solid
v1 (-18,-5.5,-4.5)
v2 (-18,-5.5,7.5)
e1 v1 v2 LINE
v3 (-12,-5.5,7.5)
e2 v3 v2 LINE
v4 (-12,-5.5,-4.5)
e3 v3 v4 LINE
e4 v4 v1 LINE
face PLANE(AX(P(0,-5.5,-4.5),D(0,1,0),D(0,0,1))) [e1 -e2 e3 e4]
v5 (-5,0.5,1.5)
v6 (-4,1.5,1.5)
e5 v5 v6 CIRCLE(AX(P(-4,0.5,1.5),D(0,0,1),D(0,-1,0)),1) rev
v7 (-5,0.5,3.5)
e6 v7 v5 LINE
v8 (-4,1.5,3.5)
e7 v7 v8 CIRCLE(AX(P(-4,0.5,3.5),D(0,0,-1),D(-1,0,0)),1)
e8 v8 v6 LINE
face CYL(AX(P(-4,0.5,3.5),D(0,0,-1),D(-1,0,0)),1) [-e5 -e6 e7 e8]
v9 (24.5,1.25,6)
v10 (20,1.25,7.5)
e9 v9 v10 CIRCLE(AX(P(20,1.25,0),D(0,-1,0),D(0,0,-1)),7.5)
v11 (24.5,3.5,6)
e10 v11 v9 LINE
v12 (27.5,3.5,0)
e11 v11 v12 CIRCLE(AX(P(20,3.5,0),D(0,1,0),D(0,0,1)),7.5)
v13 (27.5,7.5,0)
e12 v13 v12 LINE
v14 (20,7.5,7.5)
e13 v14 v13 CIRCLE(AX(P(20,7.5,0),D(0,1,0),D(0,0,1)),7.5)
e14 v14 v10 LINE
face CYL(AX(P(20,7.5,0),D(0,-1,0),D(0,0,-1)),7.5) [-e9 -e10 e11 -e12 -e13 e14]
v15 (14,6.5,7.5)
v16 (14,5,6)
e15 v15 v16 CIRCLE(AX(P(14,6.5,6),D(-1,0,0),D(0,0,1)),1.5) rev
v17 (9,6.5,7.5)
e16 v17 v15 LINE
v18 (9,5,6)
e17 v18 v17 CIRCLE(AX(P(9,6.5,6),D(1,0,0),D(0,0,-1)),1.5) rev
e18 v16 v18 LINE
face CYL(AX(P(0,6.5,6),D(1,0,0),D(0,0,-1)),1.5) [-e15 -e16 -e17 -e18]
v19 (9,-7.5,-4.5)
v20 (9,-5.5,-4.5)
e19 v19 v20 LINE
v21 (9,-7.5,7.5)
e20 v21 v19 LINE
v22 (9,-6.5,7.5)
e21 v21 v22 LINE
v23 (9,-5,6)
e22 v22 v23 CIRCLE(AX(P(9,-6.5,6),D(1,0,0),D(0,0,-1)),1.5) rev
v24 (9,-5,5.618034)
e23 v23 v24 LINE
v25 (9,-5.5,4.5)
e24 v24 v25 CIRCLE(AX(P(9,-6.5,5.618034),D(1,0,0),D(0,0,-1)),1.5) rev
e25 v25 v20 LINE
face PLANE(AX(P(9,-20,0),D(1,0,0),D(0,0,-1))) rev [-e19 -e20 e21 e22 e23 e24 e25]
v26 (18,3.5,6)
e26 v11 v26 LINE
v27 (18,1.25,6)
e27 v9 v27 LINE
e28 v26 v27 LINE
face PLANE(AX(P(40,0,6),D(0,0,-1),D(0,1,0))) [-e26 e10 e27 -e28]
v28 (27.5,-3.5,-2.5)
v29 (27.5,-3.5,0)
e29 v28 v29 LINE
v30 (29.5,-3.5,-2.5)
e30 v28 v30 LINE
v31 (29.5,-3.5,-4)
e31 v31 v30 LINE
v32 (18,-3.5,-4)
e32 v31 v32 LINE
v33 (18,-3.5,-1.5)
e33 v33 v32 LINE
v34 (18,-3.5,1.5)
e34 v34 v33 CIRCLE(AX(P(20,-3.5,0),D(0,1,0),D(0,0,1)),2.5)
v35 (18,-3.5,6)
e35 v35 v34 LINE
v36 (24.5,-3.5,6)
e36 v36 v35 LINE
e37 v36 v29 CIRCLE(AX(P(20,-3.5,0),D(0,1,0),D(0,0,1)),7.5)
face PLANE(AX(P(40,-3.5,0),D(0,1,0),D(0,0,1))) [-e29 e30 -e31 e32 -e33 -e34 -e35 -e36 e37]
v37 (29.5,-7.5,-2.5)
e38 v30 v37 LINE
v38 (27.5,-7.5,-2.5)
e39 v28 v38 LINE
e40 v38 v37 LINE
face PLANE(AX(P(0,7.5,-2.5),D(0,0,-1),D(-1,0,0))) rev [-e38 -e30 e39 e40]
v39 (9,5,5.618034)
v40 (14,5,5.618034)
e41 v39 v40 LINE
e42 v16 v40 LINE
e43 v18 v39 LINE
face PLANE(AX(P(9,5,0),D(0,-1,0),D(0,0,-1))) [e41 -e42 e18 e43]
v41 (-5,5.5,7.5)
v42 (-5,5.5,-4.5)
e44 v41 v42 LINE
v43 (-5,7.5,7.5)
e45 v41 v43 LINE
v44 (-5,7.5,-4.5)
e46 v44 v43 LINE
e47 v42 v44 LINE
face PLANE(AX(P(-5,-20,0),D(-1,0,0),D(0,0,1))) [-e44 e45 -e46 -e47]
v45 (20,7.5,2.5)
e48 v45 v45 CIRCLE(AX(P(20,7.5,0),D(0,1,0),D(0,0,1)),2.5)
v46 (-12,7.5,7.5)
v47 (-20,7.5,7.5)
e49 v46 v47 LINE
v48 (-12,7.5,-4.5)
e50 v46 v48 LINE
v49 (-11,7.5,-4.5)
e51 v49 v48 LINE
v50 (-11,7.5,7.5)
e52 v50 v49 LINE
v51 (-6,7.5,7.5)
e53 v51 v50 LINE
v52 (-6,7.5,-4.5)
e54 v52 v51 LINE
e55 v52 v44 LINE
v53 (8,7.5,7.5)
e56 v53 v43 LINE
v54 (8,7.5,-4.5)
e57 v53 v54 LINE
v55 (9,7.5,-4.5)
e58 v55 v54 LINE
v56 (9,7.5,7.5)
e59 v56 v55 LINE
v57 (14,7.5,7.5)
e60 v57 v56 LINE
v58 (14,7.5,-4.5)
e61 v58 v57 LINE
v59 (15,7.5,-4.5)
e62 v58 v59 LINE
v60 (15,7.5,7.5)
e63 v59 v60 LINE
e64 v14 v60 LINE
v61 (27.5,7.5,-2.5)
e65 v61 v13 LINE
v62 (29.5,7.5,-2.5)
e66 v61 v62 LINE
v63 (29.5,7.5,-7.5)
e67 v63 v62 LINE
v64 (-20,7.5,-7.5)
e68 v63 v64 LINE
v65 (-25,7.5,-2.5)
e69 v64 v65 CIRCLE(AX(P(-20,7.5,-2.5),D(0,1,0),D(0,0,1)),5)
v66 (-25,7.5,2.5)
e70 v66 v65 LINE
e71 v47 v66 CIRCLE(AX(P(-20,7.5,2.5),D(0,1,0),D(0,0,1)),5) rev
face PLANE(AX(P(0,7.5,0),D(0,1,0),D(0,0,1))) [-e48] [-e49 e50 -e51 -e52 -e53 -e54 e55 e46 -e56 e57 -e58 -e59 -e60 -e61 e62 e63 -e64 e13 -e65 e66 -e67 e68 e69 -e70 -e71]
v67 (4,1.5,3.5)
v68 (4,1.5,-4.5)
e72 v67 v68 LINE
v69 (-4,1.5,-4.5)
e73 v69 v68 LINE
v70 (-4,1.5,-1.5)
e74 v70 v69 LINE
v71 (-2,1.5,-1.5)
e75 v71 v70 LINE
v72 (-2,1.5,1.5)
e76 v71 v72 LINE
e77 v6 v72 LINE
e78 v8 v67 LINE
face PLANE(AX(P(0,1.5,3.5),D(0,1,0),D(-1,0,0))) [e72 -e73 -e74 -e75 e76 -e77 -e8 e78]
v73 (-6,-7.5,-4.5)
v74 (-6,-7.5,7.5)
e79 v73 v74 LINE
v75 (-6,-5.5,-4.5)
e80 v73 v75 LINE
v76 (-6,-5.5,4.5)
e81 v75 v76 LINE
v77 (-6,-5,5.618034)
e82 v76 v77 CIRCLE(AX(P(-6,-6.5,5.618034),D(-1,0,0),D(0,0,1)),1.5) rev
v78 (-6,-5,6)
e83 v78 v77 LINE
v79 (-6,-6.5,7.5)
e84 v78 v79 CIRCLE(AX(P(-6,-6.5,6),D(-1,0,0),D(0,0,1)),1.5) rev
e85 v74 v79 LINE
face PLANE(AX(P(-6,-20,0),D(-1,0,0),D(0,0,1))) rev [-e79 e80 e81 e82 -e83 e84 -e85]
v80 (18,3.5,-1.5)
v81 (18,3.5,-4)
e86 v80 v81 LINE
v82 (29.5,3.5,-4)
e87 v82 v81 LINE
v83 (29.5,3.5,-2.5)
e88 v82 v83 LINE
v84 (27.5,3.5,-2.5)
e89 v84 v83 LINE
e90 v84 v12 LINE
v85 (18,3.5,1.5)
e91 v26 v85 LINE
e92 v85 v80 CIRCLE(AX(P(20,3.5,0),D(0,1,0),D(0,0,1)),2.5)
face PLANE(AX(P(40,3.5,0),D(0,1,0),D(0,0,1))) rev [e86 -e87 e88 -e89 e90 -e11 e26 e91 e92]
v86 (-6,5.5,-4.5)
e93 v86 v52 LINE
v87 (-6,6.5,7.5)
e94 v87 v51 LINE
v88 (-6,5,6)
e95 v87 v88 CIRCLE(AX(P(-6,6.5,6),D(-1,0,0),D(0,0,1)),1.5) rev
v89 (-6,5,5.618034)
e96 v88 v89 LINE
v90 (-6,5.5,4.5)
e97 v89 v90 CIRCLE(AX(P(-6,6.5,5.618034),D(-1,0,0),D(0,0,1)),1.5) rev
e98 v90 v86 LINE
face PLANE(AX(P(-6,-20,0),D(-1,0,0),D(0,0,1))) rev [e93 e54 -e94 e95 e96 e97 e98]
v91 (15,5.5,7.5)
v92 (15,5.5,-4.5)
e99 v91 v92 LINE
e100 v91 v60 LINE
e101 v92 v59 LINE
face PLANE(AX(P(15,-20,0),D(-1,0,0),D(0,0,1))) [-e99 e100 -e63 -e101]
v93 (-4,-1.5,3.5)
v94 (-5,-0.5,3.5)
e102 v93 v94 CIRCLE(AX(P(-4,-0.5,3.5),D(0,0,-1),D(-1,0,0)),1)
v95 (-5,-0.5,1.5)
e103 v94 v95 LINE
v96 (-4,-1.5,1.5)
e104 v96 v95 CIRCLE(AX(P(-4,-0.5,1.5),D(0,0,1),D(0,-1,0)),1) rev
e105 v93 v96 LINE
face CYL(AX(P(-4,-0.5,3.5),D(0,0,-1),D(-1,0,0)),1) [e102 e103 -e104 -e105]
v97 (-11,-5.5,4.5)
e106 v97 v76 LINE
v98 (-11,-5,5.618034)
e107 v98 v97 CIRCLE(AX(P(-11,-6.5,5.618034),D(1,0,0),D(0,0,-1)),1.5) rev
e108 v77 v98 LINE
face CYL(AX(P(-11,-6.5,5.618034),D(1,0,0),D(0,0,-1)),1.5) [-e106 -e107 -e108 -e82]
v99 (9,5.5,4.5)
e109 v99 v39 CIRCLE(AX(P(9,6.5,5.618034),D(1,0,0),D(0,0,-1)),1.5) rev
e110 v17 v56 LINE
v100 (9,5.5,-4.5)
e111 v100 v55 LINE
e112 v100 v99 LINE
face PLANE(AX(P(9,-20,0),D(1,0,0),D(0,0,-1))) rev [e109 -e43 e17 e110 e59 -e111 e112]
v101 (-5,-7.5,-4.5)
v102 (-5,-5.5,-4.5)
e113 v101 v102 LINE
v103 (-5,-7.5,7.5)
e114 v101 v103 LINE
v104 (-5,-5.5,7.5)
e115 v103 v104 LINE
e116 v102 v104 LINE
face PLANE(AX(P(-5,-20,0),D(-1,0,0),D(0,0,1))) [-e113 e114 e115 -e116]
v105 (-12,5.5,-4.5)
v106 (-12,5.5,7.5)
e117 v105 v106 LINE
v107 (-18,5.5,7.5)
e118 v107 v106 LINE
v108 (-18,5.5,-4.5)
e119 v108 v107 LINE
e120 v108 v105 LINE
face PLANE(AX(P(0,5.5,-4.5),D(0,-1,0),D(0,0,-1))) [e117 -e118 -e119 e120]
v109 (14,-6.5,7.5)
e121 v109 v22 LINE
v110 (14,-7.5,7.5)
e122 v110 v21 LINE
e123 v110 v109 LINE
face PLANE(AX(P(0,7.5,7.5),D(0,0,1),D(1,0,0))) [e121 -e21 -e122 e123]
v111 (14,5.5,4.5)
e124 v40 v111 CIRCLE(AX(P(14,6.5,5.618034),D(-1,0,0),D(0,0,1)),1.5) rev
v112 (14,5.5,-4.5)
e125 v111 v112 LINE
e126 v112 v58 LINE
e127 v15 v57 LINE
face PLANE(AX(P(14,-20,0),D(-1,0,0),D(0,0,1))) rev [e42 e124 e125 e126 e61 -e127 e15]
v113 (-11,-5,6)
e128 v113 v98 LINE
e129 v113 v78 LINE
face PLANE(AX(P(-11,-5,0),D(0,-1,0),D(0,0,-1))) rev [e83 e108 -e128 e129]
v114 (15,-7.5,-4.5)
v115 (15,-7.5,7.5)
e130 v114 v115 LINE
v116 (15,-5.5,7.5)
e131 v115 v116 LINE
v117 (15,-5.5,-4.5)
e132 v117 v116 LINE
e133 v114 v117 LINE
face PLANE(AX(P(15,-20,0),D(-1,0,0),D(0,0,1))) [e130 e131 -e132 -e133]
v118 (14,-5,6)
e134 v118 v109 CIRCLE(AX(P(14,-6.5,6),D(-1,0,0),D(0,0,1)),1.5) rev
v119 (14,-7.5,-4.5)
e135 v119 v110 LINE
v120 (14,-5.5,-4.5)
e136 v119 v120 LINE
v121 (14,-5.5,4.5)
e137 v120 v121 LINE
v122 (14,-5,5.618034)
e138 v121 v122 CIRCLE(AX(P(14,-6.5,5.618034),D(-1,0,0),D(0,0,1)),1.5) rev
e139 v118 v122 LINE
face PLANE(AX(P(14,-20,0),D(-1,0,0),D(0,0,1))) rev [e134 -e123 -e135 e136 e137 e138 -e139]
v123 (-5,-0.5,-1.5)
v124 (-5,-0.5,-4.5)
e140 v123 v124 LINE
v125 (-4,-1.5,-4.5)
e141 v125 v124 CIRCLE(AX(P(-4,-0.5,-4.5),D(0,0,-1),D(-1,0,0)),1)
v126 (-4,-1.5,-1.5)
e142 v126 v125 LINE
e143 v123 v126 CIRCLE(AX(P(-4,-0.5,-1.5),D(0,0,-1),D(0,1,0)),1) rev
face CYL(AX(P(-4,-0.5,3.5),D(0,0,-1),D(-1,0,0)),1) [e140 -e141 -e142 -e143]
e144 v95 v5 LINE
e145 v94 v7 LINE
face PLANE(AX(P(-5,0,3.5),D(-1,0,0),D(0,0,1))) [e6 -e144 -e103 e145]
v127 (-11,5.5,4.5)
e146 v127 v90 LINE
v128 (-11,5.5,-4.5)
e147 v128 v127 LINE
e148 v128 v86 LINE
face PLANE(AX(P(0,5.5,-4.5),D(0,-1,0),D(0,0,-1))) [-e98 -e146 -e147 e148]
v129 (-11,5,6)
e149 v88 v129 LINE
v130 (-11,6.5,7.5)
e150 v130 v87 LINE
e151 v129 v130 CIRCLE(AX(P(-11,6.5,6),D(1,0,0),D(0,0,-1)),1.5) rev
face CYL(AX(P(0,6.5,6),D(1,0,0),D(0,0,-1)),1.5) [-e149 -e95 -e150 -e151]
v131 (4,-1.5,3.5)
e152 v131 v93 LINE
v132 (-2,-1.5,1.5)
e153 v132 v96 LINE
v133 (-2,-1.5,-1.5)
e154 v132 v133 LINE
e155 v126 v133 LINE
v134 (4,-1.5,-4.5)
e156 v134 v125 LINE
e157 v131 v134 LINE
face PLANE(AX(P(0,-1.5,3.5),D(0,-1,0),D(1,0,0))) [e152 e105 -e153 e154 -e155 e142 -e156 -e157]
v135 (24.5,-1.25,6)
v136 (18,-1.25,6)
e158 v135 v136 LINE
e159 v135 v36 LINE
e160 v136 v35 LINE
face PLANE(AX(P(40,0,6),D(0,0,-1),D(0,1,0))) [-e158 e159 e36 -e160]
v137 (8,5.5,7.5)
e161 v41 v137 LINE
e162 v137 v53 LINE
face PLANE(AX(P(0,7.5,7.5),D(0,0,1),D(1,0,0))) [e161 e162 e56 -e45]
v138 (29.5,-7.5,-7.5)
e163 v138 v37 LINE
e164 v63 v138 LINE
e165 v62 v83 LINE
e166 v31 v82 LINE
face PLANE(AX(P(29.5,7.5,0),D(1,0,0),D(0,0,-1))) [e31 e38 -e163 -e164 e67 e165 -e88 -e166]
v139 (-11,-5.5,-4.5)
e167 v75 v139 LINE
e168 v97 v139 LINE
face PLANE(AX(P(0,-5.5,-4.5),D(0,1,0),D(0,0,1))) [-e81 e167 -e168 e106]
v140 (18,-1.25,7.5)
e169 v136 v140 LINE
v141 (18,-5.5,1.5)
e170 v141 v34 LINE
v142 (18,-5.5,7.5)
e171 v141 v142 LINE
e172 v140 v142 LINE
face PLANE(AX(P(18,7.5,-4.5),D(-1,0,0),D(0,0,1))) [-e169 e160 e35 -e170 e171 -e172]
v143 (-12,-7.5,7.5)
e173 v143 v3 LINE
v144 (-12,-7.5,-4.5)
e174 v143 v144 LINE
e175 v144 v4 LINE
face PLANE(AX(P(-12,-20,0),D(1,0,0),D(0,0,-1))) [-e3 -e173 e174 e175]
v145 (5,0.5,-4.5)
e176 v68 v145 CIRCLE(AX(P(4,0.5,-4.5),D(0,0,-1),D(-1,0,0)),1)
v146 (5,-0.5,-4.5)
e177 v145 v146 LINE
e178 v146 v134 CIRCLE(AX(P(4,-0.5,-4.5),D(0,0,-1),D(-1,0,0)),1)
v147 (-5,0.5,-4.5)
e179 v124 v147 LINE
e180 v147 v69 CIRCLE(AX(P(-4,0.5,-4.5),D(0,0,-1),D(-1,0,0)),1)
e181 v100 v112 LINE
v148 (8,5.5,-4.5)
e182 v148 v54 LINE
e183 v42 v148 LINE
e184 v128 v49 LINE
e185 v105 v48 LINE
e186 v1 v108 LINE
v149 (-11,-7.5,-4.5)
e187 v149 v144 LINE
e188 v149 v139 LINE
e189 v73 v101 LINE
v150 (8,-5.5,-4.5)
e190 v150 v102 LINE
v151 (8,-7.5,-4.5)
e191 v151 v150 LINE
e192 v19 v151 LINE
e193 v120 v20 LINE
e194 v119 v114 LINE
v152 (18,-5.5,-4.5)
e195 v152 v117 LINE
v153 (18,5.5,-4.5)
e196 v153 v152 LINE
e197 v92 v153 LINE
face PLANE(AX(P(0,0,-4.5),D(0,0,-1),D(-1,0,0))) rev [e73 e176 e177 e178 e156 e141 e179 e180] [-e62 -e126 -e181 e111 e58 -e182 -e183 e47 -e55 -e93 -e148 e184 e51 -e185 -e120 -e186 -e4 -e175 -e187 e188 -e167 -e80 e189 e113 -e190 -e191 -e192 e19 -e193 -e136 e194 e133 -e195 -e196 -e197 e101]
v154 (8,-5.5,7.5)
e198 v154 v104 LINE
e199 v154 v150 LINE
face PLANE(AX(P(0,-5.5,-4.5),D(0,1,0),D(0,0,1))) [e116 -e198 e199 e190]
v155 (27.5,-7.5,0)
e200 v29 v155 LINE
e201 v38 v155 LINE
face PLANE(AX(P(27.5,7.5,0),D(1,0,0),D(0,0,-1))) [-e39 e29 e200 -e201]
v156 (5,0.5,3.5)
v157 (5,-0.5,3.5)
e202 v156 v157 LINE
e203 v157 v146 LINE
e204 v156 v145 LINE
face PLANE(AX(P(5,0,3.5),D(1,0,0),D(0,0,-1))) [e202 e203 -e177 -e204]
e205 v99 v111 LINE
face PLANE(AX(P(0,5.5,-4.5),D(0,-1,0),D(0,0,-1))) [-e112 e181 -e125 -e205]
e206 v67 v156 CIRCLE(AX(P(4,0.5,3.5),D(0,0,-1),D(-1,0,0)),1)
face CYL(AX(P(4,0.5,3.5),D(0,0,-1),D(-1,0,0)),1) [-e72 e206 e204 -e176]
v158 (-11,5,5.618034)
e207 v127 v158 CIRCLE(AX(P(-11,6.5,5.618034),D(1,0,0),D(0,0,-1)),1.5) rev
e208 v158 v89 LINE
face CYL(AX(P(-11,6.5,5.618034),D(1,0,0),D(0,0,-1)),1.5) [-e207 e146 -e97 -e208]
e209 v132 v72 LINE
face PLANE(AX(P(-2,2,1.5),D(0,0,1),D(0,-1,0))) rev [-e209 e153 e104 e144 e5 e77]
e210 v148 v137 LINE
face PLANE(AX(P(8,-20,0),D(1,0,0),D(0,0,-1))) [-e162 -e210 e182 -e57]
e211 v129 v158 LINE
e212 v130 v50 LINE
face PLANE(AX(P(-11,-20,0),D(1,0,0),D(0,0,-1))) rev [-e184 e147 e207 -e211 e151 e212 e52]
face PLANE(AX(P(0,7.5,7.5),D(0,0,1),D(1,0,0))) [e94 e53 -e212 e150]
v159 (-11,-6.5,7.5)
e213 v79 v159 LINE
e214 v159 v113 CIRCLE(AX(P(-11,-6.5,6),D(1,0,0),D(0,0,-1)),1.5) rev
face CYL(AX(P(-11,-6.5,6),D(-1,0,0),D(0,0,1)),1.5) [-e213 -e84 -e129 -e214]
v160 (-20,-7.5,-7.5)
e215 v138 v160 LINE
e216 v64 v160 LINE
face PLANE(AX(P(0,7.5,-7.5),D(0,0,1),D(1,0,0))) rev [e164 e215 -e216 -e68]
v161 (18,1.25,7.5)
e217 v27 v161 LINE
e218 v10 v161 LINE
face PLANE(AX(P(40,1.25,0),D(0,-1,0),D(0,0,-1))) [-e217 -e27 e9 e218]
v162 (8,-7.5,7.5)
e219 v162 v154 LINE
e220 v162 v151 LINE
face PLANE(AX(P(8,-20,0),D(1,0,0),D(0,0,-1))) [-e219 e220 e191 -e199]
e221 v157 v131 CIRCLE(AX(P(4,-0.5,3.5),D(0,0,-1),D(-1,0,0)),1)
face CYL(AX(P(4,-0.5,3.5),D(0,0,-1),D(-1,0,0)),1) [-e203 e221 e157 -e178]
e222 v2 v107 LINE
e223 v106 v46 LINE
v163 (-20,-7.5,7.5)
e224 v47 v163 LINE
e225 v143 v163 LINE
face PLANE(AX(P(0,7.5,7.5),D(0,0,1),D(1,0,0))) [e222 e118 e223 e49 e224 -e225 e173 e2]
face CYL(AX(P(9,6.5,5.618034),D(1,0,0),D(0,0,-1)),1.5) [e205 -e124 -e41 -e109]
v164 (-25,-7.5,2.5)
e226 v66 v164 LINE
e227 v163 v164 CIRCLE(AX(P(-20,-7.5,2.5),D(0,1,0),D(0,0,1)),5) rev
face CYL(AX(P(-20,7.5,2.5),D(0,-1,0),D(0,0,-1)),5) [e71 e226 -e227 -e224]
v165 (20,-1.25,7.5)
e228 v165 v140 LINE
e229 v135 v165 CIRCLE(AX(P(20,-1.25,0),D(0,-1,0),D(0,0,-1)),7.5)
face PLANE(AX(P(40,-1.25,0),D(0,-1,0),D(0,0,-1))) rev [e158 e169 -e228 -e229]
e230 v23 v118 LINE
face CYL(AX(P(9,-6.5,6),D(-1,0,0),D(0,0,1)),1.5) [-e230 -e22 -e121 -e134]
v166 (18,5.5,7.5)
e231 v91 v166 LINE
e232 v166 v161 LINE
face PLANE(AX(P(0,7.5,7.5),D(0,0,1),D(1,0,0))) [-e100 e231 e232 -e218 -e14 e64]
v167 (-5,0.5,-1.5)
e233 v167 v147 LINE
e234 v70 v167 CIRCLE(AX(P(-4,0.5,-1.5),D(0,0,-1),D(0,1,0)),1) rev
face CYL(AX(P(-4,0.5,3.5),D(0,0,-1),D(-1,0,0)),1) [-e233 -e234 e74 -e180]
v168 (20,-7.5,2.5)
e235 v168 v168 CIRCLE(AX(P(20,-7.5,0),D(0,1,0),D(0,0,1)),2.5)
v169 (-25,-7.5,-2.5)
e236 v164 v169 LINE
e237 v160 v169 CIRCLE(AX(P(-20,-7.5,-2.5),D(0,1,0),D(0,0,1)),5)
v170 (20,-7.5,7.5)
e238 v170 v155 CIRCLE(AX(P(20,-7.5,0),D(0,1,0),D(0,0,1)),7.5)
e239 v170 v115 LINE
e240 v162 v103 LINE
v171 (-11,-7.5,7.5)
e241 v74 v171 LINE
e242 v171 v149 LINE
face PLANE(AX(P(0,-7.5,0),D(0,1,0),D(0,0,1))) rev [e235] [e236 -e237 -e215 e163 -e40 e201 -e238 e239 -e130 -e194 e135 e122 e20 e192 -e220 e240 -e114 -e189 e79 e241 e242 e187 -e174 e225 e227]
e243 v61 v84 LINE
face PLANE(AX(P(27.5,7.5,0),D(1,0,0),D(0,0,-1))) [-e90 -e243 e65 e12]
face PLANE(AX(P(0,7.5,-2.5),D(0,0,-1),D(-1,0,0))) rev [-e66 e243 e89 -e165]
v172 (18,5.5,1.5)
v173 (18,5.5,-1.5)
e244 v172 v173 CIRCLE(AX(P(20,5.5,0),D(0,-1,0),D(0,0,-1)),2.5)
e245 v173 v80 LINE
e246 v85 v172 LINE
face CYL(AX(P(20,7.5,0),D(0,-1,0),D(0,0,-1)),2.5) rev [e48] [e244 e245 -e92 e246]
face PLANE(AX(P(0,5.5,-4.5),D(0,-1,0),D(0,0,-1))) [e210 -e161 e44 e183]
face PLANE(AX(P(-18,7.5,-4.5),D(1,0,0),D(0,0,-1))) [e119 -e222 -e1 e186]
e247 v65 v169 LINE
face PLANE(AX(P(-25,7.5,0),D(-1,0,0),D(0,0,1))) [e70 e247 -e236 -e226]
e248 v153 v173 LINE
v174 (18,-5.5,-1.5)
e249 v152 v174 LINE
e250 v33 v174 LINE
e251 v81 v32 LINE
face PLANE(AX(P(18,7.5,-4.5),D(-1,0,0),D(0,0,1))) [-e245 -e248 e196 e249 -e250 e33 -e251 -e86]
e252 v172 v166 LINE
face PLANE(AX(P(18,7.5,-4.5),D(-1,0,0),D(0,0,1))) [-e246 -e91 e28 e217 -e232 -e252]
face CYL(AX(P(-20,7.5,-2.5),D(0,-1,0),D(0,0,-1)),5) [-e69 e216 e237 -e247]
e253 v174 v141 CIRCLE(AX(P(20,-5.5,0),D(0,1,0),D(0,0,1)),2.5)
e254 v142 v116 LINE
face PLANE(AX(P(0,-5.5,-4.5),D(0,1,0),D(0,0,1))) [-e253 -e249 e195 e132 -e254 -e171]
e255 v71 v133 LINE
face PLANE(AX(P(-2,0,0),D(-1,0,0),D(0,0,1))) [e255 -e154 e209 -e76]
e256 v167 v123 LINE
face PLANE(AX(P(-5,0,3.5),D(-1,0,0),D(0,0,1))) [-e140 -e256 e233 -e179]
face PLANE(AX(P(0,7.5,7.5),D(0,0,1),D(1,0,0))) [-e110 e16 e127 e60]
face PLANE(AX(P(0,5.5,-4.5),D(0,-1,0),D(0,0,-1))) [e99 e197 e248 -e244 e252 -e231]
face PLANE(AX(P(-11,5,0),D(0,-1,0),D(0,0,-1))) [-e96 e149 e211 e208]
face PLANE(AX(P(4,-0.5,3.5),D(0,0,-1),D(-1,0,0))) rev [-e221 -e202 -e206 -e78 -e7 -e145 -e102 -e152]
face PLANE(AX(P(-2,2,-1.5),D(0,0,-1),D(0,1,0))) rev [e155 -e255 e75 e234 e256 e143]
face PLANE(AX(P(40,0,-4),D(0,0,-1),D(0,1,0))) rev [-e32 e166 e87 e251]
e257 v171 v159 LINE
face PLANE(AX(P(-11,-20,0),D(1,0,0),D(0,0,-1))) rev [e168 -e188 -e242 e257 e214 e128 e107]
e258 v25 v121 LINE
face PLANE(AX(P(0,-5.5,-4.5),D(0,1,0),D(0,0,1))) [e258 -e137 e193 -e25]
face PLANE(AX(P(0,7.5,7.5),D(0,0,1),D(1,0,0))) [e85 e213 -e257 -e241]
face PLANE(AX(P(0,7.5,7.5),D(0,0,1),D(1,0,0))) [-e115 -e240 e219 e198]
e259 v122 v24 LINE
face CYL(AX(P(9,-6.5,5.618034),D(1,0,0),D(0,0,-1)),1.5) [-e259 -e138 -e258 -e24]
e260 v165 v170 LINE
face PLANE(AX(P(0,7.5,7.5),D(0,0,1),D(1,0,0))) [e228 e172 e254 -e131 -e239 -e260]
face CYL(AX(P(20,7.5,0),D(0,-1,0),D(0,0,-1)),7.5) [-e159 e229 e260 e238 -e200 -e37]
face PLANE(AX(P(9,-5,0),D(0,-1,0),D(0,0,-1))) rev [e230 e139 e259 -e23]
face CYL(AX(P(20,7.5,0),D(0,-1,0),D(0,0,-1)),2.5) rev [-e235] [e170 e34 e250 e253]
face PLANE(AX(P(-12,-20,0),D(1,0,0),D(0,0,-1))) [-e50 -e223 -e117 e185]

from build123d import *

# Parameters (mm, degrees)
SKETCH1_R             = 7.5
SKETCH1_R_2           = 2.5
SKETCH1_W             = 2
SKETCH1_H             = 5
BOSS_EXTRUDE1_DEPTH   = 7.5
CUT_EXTRUDE1_START    = 7.5
SKETCH2_W             = 36
SKETCH2_H             = 11
CUT_EXTRUDE1_DEPTH    = 12
SKETCH3_W             = 1.5
SKETCH3_H             = 2.5
SKETCH3_W_2           = 10
SKETCH3_H_2           = 7
CUT_EXTRUDE2_DEPTH    = 40
SKETCH5_W             = 1
SKETCH5_H             = 12
CUT_EXTRUDE3_DEPTH    = 20
BOSS_EXTRUDE2_START   = 14
SKETCH6_W             = 3
SKETCH6_H             = 0.5
BOSS_EXTRUDE2_DEPTH   = 5
FILLET2_R             = 1.5
LPATTERN4_START       = -12
LPATTERN4_OUTLINE_W   = 2
LPATTERN4_OUTLINE_H   = 12
LPATTERN4_DEPTH       = 1
LPATTERN4_START_2     = -6
LPATTERN4_2_OUTLINE_W = 2
LPATTERN4_2_OUTLINE_H = 12
LPATTERN4_2_DEPTH     = 1
LPATTERN4_START_3     = -11
LPATTERN4_3_DEPTH     = 5
LPATTERN4_4_DEPTH     = 5
BOSS_EXTRUDE3_START   = -4.5
BOSS_EXTRUDE3_DEPTH   = 8
SKETCH8_W             = 3
SKETCH8_H             = 4
CUT_EXTRUDE4_DEPTH    = 3


# Read off the part's stored shape, not the designer's step: LPattern4
with BuildPart() as part:
    # Sketch1 → Boss-Extrude1 (new, symmetric)
    # profile 1 of 4: a face of its own
    with BuildSketch(Plane(origin=(0, 0, 0), x_dir=(1, 0, 0), z_dir=(0, 1, 0))):
        with BuildLine():
            ThreePointArc((20, -7.5), (12.5, 0), (20, 7.5))
            Line((20, 7.5), (-20, 7.5))
            ThreePointArc((-20, 7.5), (-23.535533906, 6.035533906), (-25, 2.5))
            Line((-25, 2.5), (-25, -2.5))
            ThreePointArc((-25, -2.5), (-23.535533906, -6.035533906), (-20, -7.5))
            Line((-20, -7.5), (20, -7.5))
        make_face()
    # profile 2 of 4: a face of its own
    with BuildSketch(Plane(origin=(0, 0, 0), x_dir=(1, 0, 0), z_dir=(0, 1, 0))):
        with Locations((20, 0)):
            Circle(SKETCH1_R)
        with Locations(Location((20, 0, 0), (0, 0, 270))):
            Circle(SKETCH1_R_2, mode=Mode.SUBTRACT)
    # profile 3 of 4: a face of its own
    with BuildSketch(Plane(origin=(0, 0, 0), x_dir=(1, 0, 0), z_dir=(0, 1, 0))):
        with BuildLine():
            Line((27.5, 2.5), (27.5, 7.5))
            Line((27.5, 7.5), (20, 7.5))
            ThreePointArc((20, 7.5), (25.303300859, 5.303300859), (27.5, 0))
            Line((27.5, 0), (27.5, 2.5))
        make_face()
    # profile 4 of 4: a face of its own
    with BuildSketch(Plane(origin=(0, 0, 0), x_dir=(1, 0, 0), z_dir=(0, 1, 0))):
        with Locations((28.5, 5)):
            Rectangle(SKETCH1_W, SKETCH1_H)
    extrude(amount=BOSS_EXTRUDE1_DEPTH, both=True)

    # Sketch2 → Cut-Extrude1 (cut)
    with BuildSketch(Plane.XY.offset(CUT_EXTRUDE1_START)):
        Rectangle(SKETCH2_W, SKETCH2_H)
    extrude(amount=-CUT_EXTRUDE1_DEPTH, mode=Mode.SUBTRACT)

    # Sketch3 → Cut-Extrude2 (cut)
    with BuildSketch(Plane(origin=(0, 0, 0), x_dir=(0, 0, -1), z_dir=(1, 0, 0))):
        with Locations((-6.75, 0)):
            Rectangle(SKETCH3_W, SKETCH3_H)
        with Locations((-1, 0)):
            Rectangle(SKETCH3_W_2, SKETCH3_H_2)
    extrude(amount=CUT_EXTRUDE2_DEPTH, mode=Mode.SUBTRACT)

    # Sketch5 → Cut-Extrude3 (cut, symmetric)
    with BuildSketch(Plane(origin=(0, 0, 0), x_dir=(1, 0, 0), z_dir=(0, 1, 0))):
        with Locations((8.5, -1.5)):
            Rectangle(SKETCH5_W, SKETCH5_H)
        with Locations((14.5, -1.5)):
            Rectangle(SKETCH5_W, SKETCH5_H)
    extrude(amount=CUT_EXTRUDE3_DEPTH, both=True, mode=Mode.SUBTRACT)

    # Sketch6 → Boss-Extrude2 (add)
    with BuildSketch(Plane(origin=(0, 0, 0), x_dir=(0, 0, -1), z_dir=(1, 0, 0)).offset(BOSS_EXTRUDE2_START)):
        with Locations((-6, 5.25)):
            Rectangle(SKETCH6_W, SKETCH6_H)
        with Locations((-6, -5.25)):
            Rectangle(SKETCH6_W, SKETCH6_H)
    extrude(amount=-BOSS_EXTRUDE2_DEPTH)

    # Fillet2
    # the kernel refuses this fillet: 1.5 mm, written as the material it takes off along each edge
    with BuildSketch(Plane(origin=(16.795084972, 5, 4.5), x_dir=(0, 0, 1), z_dir=(-1, 0, 0))) as fillet2_piece_1:
        with BuildLine():
            CenterArc((1.118033989, 1.5), FILLET2_R, 221.810314896, 48.189685104)
            Line((0, 0.5), (0, 0))
            Line((0, 0), (1.118033989, 0))
        make_face()
    extrude(amount=10.590169944, mode=Mode.SUBTRACT)
    with BuildSketch(Plane(origin=(17.75, 5, 7.5), x_dir=(0, 1, 0), z_dir=(-1, 0, 0))) as fillet2_piece_2_section:
        with BuildLine():
            CenterArc((FILLET2_R, FILLET2_R), FILLET2_R, 180, 90)
            Line((0, FILLET2_R), (0, 0))
            Line((0, 0), (FILLET2_R, 0))
        make_face()
    fillet2_piece_2 = extrude(amount=12.5, mode=Mode.PRIVATE)
    fillet2_piece_2 = split(fillet2_piece_2, bisect_by=Plane(origin=(15, 5.743185978, 7.388433108), z_dir=(-1, 0, 0)), keep=Keep.TOP, mode=Mode.PRIVATE)
    fillet2_piece_2 = split(fillet2_piece_2, bisect_by=Plane(origin=(8, 5.743185978, 7.388433108), z_dir=(1, 0, 0)), keep=Keep.TOP, mode=Mode.PRIVATE)
    add(fillet2_piece_2, mode=Mode.SUBTRACT)
    with BuildSketch(Plane(origin=(16.795084972, -5, 4.5), x_dir=(0, 0, 1), z_dir=(-1, 0, 0))) as fillet2_piece_3:
        with BuildLine():
            CenterArc((1.118033989, -1.5), FILLET2_R, 90, 48.189685104)
            Line((0, -0.5), (0, 0))
            Line((0, 0), (1.118033989, 0))
        make_face()
    extrude(amount=10.590169944, mode=Mode.SUBTRACT)
    with BuildSketch(Plane(origin=(17.75, -5, 7.5), x_dir=(0, -1, 0), z_dir=(-1, 0, 0))) as fillet2_piece_4_section:
        with BuildLine():
            CenterArc((FILLET2_R, -FILLET2_R), FILLET2_R, 90, 90)
            Line((0, -FILLET2_R), (0, 0))
            Line((0, 0), (FILLET2_R, 0))
        make_face()
    fillet2_piece_4 = extrude(amount=8.75, mode=Mode.PRIVATE)
    fillet2_piece_4 = split(fillet2_piece_4, bisect_by=Plane(origin=(15, -5.743185978, 7.388433108), z_dir=(-1, 0, 0)), keep=Keep.TOP, mode=Mode.PRIVATE)
    add(fillet2_piece_4, mode=Mode.SUBTRACT)

    # LPattern4 outline → LPattern4 (cut)
    with BuildSketch(Plane.YZ.offset(LPATTERN4_START)):
        with Locations((-6.5, 1.5)):
            Rectangle(LPATTERN4_OUTLINE_W, LPATTERN4_OUTLINE_H)
        with Locations((6.5, 1.5)):
            Rectangle(LPATTERN4_OUTLINE_W, LPATTERN4_OUTLINE_H)
    extrude(amount=LPATTERN4_DEPTH, mode=Mode.SUBTRACT)

    # LPattern4 2 outline → LPattern4 2 (cut)
    with BuildSketch(Plane.YZ.offset(LPATTERN4_START_2)):
        with Locations((-6.5, 1.5)):
            Rectangle(LPATTERN4_2_OUTLINE_W, LPATTERN4_2_OUTLINE_H)
        with Locations((6.5, 1.5)):
            Rectangle(LPATTERN4_2_OUTLINE_W, LPATTERN4_2_OUTLINE_H)
    extrude(amount=LPATTERN4_2_DEPTH, mode=Mode.SUBTRACT)

    # LPattern4 3 outline → LPattern4 3 (cut)
    with BuildSketch(Plane.YZ.offset(LPATTERN4_START_3)):
        with BuildLine():
            ThreePointArc((-6.5, 7.5), (-5.964766865, 7.401258539), (-5.5, 7.118033989))
            Line((-5.5, 7.118033989), (-5.5, 7.5))
            Line((-5.5, 7.5), (-6.5, 7.5))
        make_face()
        with BuildLine():
            Line((6.5, 7.5), (5.5, 7.5))
            Line((5.5, 7.5), (5.5, 7.118033989))
            ThreePointArc((5.5, 7.118033989), (5.964766865, 7.401258539), (6.5, 7.5))
        make_face()
    extrude(amount=LPATTERN4_3_DEPTH, mode=Mode.SUBTRACT)

    # LPattern4 4 outline → LPattern4 4 (add)
    with BuildSketch(Plane.YZ.offset(LPATTERN4_START_3)):
        with BuildLine():
            Line((-5, 5.618033989), (-5, 6))
            ThreePointArc((-5, 6), (-5.130693606, 6.612372436), (-5.5, 7.118033989))
            Line((-5.5, 7.118033989), (-5.5, 4.5))
            ThreePointArc((-5.5, 4.5), (-5.130693606, 5.005661553), (-5, 5.618033989))
        make_face()
        with BuildLine():
            Line((5.5, 4.5), (5.5, 7.118033989))
            ThreePointArc((5.5, 7.118033989), (5.130693606, 6.612372436), (5, 6))
            Line((5, 6), (5, 5.618033989))
            ThreePointArc((5, 5.618033989), (5.130693606, 5.005661553), (5.5, 4.5))
        make_face()
    extrude(amount=LPATTERN4_4_DEPTH)

    # Sketch7 → Boss-Extrude3 (add)
    with BuildSketch(Plane.XY.offset(BOSS_EXTRUDE3_START)):
        with BuildLine():
            Line((4, -1.5), (-4, -1.5))
            ThreePointArc((-4, -1.5), (-4.707106781, -1.207106781), (-5, -0.5))
            Line((-5, -0.5), (-5, 0.5))
            ThreePointArc((-5, 0.5), (-4.707106781, 1.207106781), (-4, 1.5))
            Line((-4, 1.5), (4, 1.5))
            ThreePointArc((4, 1.5), (4.707106781, 1.207106781), (5, 0.5))
            Line((5, 0.5), (5, -0.5))
            ThreePointArc((5, -0.5), (4.707106781, -1.207106781), (4, -1.5))
        make_face()
    extrude(amount=BOSS_EXTRUDE3_DEPTH)

    # Sketch8 → Cut-Extrude4 (cut)
    with BuildSketch(Plane.ZY.offset(5)):
        Rectangle(SKETCH8_W, SKETCH8_H)
    extrude(amount=-CUT_EXTRUDE4_DEPTH, mode=Mode.SUBTRACT)


solid = part.part
